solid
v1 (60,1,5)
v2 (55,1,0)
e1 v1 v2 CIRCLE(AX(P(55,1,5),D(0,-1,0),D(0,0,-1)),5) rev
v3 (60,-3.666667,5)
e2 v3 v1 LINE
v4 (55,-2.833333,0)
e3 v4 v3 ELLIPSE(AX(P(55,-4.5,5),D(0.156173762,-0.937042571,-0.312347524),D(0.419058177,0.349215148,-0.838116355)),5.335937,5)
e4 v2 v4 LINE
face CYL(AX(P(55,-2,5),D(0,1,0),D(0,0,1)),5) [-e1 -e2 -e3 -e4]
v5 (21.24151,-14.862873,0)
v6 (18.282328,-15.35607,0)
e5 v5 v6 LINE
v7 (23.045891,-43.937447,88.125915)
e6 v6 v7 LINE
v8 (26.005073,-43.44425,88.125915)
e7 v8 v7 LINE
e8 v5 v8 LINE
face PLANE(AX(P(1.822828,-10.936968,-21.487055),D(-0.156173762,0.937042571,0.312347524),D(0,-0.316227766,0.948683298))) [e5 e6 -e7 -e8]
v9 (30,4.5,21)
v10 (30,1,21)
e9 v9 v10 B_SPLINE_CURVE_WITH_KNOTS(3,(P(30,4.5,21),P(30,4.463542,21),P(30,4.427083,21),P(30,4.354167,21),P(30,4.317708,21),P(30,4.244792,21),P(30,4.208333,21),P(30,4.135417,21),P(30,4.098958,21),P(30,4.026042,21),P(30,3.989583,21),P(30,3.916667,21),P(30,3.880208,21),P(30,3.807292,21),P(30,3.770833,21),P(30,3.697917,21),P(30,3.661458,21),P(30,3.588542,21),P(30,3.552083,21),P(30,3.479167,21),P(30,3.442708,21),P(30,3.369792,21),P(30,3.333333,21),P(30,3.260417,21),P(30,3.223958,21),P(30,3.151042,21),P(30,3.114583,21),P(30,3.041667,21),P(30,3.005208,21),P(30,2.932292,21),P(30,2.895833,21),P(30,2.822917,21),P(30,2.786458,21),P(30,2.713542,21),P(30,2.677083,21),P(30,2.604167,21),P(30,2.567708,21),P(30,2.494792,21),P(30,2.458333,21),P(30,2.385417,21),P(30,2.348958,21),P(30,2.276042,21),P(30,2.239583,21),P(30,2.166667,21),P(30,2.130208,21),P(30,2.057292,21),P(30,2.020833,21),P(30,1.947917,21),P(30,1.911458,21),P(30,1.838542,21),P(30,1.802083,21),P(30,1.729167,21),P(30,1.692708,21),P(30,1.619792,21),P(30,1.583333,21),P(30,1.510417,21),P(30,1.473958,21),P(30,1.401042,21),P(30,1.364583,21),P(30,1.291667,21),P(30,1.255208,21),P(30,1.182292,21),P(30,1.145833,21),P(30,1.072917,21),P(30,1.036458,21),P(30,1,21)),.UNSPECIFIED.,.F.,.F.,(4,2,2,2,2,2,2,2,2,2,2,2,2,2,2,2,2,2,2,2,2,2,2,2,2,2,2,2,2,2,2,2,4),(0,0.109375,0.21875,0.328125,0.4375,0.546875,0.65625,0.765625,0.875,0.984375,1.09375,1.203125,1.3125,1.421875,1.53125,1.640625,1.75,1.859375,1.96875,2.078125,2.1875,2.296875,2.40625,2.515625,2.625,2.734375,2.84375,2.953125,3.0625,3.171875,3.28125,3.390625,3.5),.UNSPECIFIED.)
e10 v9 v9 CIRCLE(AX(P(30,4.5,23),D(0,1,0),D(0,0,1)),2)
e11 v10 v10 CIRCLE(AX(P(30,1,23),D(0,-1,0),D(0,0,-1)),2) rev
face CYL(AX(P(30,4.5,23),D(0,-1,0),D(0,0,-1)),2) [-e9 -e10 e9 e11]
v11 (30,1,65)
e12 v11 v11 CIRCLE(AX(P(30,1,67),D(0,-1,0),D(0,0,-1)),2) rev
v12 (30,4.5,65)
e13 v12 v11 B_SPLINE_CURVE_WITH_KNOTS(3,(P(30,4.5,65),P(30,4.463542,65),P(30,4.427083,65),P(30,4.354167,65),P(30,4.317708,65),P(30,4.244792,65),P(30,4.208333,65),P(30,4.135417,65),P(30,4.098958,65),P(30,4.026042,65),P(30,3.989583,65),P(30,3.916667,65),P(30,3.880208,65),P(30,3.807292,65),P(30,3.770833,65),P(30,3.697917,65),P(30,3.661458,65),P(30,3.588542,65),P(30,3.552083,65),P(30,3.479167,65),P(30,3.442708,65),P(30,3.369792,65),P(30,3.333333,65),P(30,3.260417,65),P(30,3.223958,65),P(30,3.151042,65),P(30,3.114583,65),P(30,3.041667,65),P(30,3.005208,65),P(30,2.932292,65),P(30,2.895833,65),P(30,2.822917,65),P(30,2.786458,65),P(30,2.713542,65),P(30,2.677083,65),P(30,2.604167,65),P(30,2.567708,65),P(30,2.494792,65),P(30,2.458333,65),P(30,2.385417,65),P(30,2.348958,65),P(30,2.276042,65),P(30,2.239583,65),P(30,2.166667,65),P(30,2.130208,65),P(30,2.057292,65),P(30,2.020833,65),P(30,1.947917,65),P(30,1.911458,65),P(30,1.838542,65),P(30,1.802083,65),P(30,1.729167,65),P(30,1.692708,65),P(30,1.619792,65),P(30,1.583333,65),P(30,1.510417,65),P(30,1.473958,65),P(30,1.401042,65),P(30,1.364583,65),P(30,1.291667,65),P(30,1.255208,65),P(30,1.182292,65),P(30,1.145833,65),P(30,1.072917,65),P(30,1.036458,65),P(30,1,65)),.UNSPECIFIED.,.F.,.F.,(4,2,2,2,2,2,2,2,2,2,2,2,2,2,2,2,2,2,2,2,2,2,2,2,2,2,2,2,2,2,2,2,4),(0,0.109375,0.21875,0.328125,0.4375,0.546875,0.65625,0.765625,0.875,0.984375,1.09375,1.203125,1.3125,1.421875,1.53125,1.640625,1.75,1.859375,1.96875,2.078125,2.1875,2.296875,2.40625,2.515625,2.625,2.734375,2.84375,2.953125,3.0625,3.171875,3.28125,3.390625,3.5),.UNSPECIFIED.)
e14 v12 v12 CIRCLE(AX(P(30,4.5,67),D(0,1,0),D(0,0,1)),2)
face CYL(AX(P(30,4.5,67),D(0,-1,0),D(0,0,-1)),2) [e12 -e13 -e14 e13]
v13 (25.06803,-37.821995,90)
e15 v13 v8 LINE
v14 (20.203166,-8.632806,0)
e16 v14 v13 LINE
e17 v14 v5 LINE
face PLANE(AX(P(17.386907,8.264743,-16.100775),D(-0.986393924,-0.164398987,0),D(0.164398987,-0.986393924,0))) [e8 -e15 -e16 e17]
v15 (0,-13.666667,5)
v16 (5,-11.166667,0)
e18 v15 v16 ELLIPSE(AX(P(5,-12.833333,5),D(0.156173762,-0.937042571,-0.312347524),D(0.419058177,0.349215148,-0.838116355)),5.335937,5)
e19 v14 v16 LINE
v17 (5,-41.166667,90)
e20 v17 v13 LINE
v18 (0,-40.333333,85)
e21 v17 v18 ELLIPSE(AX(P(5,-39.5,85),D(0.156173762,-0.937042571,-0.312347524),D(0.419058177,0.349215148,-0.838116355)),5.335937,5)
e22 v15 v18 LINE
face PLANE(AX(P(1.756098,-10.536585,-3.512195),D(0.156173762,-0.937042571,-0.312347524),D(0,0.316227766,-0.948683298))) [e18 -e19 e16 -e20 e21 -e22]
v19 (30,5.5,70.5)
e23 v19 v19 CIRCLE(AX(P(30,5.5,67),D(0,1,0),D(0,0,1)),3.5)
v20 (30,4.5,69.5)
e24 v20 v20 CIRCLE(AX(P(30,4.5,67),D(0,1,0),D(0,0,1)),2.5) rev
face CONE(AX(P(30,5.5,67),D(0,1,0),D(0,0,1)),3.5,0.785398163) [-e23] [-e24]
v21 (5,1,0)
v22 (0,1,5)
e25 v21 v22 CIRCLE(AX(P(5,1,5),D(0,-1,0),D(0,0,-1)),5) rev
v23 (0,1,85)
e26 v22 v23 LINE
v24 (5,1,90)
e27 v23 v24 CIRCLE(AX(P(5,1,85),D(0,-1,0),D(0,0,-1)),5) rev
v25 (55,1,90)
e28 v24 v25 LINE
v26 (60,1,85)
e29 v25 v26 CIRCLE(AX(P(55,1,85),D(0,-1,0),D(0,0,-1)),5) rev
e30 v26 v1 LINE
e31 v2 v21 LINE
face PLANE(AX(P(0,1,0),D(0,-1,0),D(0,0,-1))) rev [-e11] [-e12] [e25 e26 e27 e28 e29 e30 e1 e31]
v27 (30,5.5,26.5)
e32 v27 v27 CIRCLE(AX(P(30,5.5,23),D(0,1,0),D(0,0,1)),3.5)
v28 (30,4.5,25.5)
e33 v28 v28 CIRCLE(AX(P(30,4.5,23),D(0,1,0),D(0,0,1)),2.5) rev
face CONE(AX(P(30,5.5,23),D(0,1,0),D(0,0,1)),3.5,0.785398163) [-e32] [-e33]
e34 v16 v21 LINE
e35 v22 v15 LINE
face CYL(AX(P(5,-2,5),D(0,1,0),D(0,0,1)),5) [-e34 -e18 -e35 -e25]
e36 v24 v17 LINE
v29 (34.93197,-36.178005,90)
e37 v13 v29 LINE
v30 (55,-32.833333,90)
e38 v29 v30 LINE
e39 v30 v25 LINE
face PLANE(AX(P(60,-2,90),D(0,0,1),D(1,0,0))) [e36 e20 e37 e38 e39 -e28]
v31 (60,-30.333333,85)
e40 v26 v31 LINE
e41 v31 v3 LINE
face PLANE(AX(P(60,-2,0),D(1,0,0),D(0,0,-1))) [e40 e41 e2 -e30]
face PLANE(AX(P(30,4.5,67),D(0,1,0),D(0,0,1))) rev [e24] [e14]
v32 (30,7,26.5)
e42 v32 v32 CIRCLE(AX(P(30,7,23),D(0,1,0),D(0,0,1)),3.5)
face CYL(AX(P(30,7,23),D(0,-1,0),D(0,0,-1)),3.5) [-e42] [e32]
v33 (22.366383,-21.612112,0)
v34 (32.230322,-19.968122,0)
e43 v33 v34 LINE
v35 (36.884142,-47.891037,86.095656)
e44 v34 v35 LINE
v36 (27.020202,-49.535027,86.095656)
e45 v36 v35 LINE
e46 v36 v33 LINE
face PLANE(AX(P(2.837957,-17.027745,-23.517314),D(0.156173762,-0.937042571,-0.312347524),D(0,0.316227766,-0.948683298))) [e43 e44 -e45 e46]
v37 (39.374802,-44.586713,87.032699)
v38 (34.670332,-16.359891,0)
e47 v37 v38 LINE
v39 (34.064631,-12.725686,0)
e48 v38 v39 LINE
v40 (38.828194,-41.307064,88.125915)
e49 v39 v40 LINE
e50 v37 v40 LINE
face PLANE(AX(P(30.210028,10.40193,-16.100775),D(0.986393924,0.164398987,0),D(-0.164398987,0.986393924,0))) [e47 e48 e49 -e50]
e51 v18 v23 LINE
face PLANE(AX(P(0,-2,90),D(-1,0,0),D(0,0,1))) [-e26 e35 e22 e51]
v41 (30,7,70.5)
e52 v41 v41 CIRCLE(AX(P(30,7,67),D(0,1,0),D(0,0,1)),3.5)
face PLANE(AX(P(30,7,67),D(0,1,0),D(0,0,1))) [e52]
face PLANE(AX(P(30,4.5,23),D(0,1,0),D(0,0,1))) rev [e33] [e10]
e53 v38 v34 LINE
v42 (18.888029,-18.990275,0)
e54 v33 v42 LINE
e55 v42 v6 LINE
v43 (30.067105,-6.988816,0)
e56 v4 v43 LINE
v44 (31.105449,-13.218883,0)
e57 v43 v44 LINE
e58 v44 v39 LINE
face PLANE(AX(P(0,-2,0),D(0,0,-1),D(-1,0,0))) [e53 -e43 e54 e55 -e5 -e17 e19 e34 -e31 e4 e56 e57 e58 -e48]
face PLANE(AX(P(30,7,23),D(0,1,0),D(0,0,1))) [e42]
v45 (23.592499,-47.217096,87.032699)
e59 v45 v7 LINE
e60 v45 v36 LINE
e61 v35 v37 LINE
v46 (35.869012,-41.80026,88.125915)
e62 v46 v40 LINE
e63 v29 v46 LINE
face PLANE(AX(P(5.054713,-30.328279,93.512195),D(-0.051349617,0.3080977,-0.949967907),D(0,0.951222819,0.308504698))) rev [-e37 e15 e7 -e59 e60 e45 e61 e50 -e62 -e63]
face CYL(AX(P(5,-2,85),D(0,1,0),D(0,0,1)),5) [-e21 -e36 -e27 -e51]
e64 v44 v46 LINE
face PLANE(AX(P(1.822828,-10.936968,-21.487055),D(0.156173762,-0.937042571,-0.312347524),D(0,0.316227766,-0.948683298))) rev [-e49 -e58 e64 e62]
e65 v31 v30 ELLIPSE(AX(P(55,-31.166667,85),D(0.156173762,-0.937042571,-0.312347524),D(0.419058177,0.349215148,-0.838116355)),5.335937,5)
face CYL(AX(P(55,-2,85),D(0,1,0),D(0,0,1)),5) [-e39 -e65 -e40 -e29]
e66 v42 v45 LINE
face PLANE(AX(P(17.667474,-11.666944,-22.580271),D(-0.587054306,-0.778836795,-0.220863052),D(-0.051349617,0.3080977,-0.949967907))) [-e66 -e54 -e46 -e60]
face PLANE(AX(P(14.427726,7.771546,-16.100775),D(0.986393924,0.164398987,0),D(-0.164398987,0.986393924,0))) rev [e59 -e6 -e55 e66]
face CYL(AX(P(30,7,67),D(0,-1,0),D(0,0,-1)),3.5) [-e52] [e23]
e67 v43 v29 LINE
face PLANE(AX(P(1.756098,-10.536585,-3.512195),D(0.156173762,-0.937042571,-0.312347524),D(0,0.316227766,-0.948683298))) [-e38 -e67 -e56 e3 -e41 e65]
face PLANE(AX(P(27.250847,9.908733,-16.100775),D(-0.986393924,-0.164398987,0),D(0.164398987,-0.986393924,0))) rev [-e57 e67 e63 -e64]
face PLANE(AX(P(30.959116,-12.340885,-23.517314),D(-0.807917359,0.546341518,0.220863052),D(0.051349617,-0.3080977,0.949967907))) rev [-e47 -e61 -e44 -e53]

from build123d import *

# Parameters (mm, degrees)
BOSS_EXTRUDE1_DEPTH      = 1
BOSS_EXTRUDE1_DEPTH_BACK = 2
SKETCH1_W                = 60
SKETCH1_H                = 90
SKETCH2_R                = 2
BOSS_EXTRUDE2_DEPTH      = 3.5
SKETCH3_R                = 3.5
BOSS_EXTRUDE3_DEPTH      = 2.5
CHAMFER1_SIZE            = 1
BOSS_EXTRUDE5_REACH      = 138.434
SKETCH1_3_W              = 60
SKETCH1_3_H              = 90
BOSS_EXTRUDE6_REACH      = 116.794
CHAMFER2_SIZE            = 3
FILLET1_R                = 5


with BuildPart() as part:
    # Sketch1 → Boss-Extrude1 (new, two sides: drawn at the far end of the back side and taken through both)
    with BuildSketch(Plane(origin=(0, 0, 0), x_dir=(1, 0, 0), z_dir=(0, 1, 0)).offset(-BOSS_EXTRUDE1_DEPTH_BACK)):
        with Locations((30, -45)):
            Rectangle(SKETCH1_W, SKETCH1_H)
    extrude(amount=BOSS_EXTRUDE1_DEPTH + BOSS_EXTRUDE1_DEPTH_BACK)

    # Sketch2 → Boss-Extrude2 (add)
    with BuildSketch(Plane(origin=(0, 1, 0), x_dir=(1, 0, 0), z_dir=(0, 1, 0))):
        with Locations((30, -23)):
            Circle(SKETCH2_R)
        with Locations((30, -67)):
            Circle(SKETCH2_R)
    extrude(amount=BOSS_EXTRUDE2_DEPTH)

    # Sketch3 → Boss-Extrude3 (add)
    with BuildSketch(Plane(origin=(0, 4.5, 0), x_dir=(1, 0, 0), z_dir=(0, 1, 0))):
        with Locations((30, -23)):
            Circle(SKETCH3_R)
        with Locations((30, -67)):
            Circle(SKETCH3_R)
    extrude(amount=BOSS_EXTRUDE3_DEPTH)

    # Chamfer1
    chamfer1_edges = [part.edges().sort_by_distance(p)[0] for p in [
        (26.5, 4.5, 23),
        (26.5, 4.5, 67),
    ]]
    chamfer(chamfer1_edges, length=CHAMFER1_SIZE)

    # Boss-Extrude5: up to this plane
    boss_extrude5_end = Plane(origin=(1.756097561, -10.536585366, -3.512195122), z_dir=(0.1561737618886063, -0.9370425713316366, -0.3123475237772119))
    # Sketch1<3> → Boss-Extrude5 (add, up to the surface)
    with BuildSketch(Plane(origin=(0, 0, 0), x_dir=(1, 0, 0), z_dir=(0, 1, 0)), mode=Mode.PRIVATE) as boss_extrude5_sk1:
        with Locations((30, -45)):
            Rectangle(SKETCH1_3_W, SKETCH1_3_H)
    boss_extrude5_tool1 = split(extrude(boss_extrude5_sk1.sketch, amount=-BOSS_EXTRUDE5_REACH, mode=Mode.PRIVATE), bisect_by=boss_extrude5_end, keep=Keep.BOTH, mode=Mode.PRIVATE)
    add(boss_extrude5_tool1.solids().sort_by_distance((30, 0, 45))[0])

    # Boss-Extrude6: up to this plane
    boss_extrude6_end = Plane(origin=(0, -2, 0), z_dir=(0, 0, -1))
    # Sketch11 → Boss-Extrude6 (add, up to the surface)
    with BuildSketch(Plane(origin=(5.05471325, -30.328279499, 93.512195122), x_dir=(-0.9986694407655652, -0.011316895385518406, 0.05031178748391653), z_dir=(-0.05134961659630974, 0.3080976995778579, -0.9499679070317293)), mode=Mode.PRIVATE) as boss_extrude6_sk1:
        Polygon((-20.078587448, -8.116309156), (-29.948006992, -6.505546026), (-30.91446487, -12.427197753), (-33.875290733, -11.943968814), (-34.922286767, -18.359091518), (-19.131215496, -20.936312525), (-18.084219462, -14.521189821), (-21.045045326, -14.037960882), align=None)
    boss_extrude6_tool1 = split(extrude(boss_extrude6_sk1.sketch, amount=BOSS_EXTRUDE6_REACH, mode=Mode.PRIVATE), bisect_by=boss_extrude6_end, keep=Keep.BOTH, mode=Mode.PRIVATE)
    add(boss_extrude6_tool1.solids().sort_by_distance((31.087503, -43.525016, 87.824995))[0])

    # Chamfer2
    chamfer2_edges = [part.edges().sort_by_distance(p)[0] for p in [
        (37.516413794, -33.436382521, 43.047827976),
        (21.734111013, -36.066766318, 43.047827976),
    ]]
    chamfer(chamfer2_edges, length=CHAMFER2_SIZE)

    # Fillet1
    fillet1_edges = [part.edges().sort_by_distance(p)[0] for p in [
        (60, -0.5, 0),
        (0, -5.5, 0),
        (60, -15.5, 90),
        (0, -20.5, 90),
    ]]
    fillet(fillet1_edges, radius=FILLET1_R)


solid = part.part
